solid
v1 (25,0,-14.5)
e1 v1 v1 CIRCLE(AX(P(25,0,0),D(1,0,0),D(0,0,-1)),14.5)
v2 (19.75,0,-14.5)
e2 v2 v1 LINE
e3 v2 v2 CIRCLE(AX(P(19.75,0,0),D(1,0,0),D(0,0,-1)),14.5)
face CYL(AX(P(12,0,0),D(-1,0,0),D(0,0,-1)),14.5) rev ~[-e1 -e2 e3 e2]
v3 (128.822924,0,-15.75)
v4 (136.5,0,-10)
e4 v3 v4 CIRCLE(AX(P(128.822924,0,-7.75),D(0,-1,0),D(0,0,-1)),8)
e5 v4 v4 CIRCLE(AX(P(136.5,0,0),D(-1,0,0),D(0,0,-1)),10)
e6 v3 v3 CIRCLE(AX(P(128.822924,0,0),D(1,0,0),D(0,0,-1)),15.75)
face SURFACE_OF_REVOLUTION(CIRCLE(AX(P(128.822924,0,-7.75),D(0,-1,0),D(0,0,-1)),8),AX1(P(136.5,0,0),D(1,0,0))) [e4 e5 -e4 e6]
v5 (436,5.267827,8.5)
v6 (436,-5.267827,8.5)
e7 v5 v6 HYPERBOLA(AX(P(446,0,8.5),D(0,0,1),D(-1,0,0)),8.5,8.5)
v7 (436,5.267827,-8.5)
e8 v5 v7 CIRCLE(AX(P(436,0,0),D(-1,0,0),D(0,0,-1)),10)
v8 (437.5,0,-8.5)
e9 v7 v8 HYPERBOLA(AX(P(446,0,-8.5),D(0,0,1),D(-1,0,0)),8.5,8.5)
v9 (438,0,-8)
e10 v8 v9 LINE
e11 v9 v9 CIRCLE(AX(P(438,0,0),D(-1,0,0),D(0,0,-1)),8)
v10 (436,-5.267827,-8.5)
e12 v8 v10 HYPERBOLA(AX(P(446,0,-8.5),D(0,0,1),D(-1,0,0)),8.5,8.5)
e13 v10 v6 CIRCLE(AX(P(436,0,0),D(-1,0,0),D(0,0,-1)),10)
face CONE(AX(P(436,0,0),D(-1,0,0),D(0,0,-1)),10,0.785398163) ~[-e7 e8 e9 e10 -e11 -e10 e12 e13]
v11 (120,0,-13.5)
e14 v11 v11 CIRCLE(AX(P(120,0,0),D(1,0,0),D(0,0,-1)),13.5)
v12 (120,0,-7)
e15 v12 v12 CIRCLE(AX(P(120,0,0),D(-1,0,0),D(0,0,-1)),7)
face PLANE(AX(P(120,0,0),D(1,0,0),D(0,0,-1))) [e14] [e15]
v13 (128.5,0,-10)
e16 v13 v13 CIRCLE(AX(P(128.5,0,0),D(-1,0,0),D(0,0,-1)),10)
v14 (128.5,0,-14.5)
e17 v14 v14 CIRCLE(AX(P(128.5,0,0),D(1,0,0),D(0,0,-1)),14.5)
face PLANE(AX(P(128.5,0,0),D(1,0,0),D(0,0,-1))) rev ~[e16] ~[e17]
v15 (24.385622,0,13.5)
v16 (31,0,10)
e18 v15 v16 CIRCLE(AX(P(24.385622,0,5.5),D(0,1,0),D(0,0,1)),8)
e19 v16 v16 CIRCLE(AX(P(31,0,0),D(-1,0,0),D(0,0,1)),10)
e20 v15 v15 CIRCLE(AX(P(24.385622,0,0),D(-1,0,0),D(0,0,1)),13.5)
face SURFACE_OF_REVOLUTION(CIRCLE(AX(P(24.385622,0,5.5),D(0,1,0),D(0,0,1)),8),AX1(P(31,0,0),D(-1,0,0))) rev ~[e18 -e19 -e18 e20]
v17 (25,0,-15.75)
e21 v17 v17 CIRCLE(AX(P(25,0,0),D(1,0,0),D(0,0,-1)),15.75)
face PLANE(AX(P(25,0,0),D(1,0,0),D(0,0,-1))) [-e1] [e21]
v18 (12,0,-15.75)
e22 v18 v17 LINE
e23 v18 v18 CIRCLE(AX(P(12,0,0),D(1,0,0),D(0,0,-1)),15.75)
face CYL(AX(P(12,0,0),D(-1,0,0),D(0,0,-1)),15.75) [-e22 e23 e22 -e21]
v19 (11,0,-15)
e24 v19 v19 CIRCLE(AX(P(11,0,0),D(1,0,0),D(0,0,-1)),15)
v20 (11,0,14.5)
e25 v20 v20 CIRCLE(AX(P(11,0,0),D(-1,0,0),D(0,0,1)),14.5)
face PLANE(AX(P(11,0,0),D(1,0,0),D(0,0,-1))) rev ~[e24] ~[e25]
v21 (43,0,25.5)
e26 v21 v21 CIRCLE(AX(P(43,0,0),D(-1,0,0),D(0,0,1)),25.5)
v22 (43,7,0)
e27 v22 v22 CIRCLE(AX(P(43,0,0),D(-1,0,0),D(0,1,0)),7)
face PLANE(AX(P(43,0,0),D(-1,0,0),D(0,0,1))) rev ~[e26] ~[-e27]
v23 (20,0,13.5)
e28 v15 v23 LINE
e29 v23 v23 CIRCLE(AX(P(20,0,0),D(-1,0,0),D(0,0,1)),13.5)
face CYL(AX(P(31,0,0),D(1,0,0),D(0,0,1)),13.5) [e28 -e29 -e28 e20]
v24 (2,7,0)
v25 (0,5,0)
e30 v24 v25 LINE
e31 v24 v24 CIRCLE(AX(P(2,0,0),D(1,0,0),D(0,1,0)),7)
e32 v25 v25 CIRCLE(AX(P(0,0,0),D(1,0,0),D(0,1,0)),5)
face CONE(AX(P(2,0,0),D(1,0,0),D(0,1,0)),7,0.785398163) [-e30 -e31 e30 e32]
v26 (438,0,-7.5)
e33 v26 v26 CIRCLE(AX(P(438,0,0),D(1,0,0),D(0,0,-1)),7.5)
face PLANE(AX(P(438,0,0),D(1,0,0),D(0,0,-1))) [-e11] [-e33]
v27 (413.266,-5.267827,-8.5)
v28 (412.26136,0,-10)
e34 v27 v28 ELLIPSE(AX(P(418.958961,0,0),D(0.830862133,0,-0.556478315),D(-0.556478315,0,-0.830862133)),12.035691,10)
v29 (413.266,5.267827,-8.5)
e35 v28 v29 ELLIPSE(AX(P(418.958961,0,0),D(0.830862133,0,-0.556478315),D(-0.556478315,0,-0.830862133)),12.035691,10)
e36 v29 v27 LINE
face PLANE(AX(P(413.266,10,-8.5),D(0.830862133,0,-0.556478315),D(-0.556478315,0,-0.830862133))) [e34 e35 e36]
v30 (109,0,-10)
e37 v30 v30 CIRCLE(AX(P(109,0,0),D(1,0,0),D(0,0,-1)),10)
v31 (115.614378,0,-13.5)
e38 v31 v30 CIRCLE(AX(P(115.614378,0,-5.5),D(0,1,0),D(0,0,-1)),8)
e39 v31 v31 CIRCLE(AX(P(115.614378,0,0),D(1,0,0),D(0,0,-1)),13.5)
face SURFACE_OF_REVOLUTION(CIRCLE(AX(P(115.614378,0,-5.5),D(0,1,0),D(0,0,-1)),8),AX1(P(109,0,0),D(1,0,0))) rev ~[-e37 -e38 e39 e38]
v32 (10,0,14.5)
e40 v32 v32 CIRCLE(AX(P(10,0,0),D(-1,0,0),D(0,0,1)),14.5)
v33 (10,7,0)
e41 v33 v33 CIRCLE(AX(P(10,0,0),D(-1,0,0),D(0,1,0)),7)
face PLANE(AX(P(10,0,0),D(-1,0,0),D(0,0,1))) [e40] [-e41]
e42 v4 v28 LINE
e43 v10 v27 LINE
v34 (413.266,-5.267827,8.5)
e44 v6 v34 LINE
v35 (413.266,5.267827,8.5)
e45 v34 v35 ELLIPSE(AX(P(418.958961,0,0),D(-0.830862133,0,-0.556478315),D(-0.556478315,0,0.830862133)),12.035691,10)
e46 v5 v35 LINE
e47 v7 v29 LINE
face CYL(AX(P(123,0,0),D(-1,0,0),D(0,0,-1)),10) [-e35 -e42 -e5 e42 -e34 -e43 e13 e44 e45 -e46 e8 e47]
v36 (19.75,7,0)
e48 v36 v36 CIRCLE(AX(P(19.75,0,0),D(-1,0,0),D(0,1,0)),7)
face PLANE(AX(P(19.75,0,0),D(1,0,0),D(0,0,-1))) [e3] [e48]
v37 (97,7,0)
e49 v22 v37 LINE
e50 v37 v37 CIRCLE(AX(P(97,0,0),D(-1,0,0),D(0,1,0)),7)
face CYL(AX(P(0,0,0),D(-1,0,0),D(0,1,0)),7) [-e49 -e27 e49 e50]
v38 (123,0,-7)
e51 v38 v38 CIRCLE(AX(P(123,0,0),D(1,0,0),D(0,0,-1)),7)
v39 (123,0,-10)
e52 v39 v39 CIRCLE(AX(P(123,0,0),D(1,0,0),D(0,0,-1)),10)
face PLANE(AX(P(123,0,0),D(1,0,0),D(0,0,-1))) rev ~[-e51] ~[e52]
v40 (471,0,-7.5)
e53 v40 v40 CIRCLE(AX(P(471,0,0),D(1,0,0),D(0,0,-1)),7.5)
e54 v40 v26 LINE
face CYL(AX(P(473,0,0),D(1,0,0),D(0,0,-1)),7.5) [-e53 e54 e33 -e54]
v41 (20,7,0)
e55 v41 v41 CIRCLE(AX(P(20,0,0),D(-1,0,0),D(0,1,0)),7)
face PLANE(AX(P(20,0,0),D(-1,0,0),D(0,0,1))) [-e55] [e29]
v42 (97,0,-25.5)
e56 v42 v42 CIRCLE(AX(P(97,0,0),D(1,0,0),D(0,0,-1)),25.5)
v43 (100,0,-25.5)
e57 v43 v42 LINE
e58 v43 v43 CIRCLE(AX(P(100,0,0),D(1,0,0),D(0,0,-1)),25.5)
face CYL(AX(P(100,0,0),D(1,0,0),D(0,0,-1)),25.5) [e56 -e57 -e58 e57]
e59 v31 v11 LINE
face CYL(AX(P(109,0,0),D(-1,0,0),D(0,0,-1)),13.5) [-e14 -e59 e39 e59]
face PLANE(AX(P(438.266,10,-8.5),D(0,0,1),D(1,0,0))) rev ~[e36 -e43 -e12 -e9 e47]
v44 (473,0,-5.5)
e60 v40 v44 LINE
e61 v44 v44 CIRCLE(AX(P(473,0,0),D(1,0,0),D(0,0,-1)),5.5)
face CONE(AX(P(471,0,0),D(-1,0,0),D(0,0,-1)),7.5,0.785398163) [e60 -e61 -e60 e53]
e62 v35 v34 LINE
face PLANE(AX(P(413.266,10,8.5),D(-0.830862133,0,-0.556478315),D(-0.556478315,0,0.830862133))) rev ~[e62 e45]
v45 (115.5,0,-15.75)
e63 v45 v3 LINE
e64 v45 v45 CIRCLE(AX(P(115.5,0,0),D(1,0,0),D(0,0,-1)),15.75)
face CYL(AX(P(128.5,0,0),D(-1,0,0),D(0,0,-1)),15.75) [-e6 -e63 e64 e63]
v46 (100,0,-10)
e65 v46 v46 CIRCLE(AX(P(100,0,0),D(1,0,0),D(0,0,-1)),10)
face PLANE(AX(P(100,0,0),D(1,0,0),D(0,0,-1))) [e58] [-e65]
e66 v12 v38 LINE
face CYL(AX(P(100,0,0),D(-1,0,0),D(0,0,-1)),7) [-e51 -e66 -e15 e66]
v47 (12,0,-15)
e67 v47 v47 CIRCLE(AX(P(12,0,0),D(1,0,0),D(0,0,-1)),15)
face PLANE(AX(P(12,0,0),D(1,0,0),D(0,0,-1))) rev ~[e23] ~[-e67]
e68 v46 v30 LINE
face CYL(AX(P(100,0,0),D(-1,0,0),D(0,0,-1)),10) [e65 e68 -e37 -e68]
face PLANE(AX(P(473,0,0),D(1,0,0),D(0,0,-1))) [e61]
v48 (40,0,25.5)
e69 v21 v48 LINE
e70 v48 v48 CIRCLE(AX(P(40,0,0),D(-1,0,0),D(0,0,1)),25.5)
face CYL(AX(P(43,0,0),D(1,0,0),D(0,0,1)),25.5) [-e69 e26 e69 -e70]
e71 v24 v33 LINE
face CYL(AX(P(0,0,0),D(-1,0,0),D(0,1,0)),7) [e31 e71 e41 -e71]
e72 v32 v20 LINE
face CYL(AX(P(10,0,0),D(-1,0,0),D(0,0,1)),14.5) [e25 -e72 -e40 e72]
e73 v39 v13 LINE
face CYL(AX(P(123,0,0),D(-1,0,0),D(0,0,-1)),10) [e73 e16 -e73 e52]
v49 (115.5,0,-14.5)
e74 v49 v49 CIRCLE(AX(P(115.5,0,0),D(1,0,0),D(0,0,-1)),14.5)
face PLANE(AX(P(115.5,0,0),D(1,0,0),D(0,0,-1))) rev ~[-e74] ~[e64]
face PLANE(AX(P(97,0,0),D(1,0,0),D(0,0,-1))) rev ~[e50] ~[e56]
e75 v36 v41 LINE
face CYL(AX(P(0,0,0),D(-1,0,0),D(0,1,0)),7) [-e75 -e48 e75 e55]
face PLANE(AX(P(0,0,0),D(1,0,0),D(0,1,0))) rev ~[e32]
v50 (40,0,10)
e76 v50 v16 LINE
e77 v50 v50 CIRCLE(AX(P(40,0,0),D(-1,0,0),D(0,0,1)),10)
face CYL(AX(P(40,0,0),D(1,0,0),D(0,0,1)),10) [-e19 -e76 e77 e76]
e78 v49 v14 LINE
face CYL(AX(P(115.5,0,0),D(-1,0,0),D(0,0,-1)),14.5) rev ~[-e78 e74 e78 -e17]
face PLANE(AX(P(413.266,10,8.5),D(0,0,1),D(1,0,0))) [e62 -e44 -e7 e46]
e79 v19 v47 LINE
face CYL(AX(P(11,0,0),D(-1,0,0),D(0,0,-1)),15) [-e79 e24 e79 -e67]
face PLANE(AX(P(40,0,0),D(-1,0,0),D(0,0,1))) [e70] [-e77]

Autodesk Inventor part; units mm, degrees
sketch "Szkic1" plane through (0, 0, 0) normal (1, 0, 0) x (0, 1, 0)
  circle A0 centre (0, 0) radius 7
  dimension "d0" = 14
extrude "Wyciągnięcie proste1" add sketch "Szkic1" along normal blind 100
sketch "Szkic2" plane through (100, 0, 0) normal (1, 0, 0) x (0, 0, -1)
  circle A0 centre (0, 0) radius 25.5
  dimension "d3" = 51
extrude "Wyciągnięcie proste2" add sketch "Szkic2" against normal blind 3
ref_plane "Płaszczyzna konstrukcyjna1" through (43, 0, 0) normal (-1, 0, 0) x (0, 0, 1)
sketch "Szkic3" plane through (43, 0, 0) normal (-1, 0, 0) x (0, 0, 1)
  circle A0 centre (0, 0) radius 25.5
extrude "Wyciągnięcie proste3" add sketch "Szkic3" along normal blind 3
sketch "Szkic4" plane through (40, 0, 0) normal (-1, 0, 0) x (0, 0, 1)
  circle A0 centre (0, 0) radius 10
  dimension "d9" = 20
extrude "Wyciągnięcie proste4" add sketch "Szkic4" along normal blind 9
sketch "Szkic5" plane through (31, 0, 0) normal (-1, 0, 0) x (0, 0, 1)
  circle A0 centre (0, 0) radius 13.5
  dimension "d12" = 27
extrude "Wyciągnięcie proste5" add sketch "Szkic5" along normal blind 11
fillet "Zaokrąglenie1" radius 8 1 edges at (31, 0, -13.5)
ref_plane "Płaszczyzna konstrukcyjna2" through (10, 0, 0) normal (-1, 0, 0) x (0, 0, 1)
sketch "Szkic6" plane through (10, 0, 0) normal (-1, 0, 0) x (0, 0, 1)
  circle A0 centre (0, 0) radius 14.5
  dimension "d19" = 29
extrude "Wyciągnięcie proste6" add sketch "Szkic6" against normal blind 1
sketch "Szkic7" plane through (11, 0, 0) normal (1, 0, 0) x (0, 0, -1)
  circle A0 centre (0, 0) radius 15
  dimension "d22" = 30
extrude "Wyciągnięcie proste7" add sketch "Szkic7" along normal blind 1
sketch "Szkic8" plane through (12, 0, 0) normal (1, 0, 0) x (0, 0, -1)
  circle A0 centre (0, 0) radius 7 projected
  circle A1 centre (0, 0) radius 15.75
  circle A2 centre (0, 0) radius 13.5 projected
  circle A3 centre (0, 0) radius 14.5
  dimension "d25" = 31.5
extrude "Wyciągnięcie proste8" add sketch "Szkic8" along normal blind 13 contours A1
extrude "Wyciągnięcie proste9" add sketch "Szkic8" along normal blind 7.75 contours A0 | A2 | A3
sketch "Szkic9" plane through (100, 0, 0) normal (1, 0, 0) x (0, 0, -1)
  circle A0 centre (0, 0) radius 7
  circle A1 centre (0, 0) radius 10
  dimension "d30" = 14
  dimension "d33" = 20
extrude "Wyciągnięcie proste10" add sketch "Szkic9" along normal blind 23 contours A0
extrude "Wyciągnięcie proste11" add sketch "Szkic9" along normal blind 9
sketch "Szkic10" plane through (109, 0, 0) normal (1, 0, 0) x (0, 0, -1)
  circle A0 centre (0, 0) radius 25.5 projected
  circle A1 centre (0, 0) radius 13.5
  dimension "d36" = 27
extrude "Wyciągnięcie proste12" add sketch "Szkic10" along normal blind 11 contours A1
fillet "Zaokrąglenie2" radius 8 1 edges at (109, 0, 13.5)
ref_plane "Płaszczyzna konstrukcyjna3" through (115.5, 0, 0) normal (1, 0, 0) x (0, 0, -1)
sketch "Szkic11" plane through (115.5, 0, 0) normal (1, 0, 0) x (0, 0, -1)
  circle A0 centre (0, 0) radius 15.75
  circle A1 centre (0, 0) radius 14.5
  dimension "d41" = 31.5
  dimension "d42" = 29
extrude "Wyciągnięcie proste13" add sketch "Szkic11" along normal blind 13
sketch "Szkic12" plane through (123, 0, 0) normal (1, 0, 0) x (0, 0, -1)
  circle A0 centre (0, 0) radius 10
  dimension "d45" = 20
extrude "Wyciągnięcie proste14" add sketch "Szkic12" along normal blind 350
ref_plane "Płaszczyzna konstrukcyjna4" through (128.5, 0, 0) normal (1, 0, 0) x (0, 0, -1)
sketch "Szkic13" plane through (128.5, 0, 0) normal (1, 0, 0) x (0, 0, -1)
  circle A0 centre (0, 0) radius 15.75
extrude "Wyciągnięcie proste15" add sketch "Szkic13" along normal blind 8
fillet "Zaokrąglenie3" radius 8 1 edges at (136.5, 0, 15.75)
sketch "Szkic14" plane through (473, 0, 0) normal (1, 0, 0) x (0, 0, -1)
  circle A0 centre (0, 0) radius 7.5
  circle A1 centre (0, 0) radius 18.8953
  dimension "d52" = 15
extrude "Wyciągnięcie proste16" cut sketch "Szkic14" against normal blind 35
thread "Gwint2" size "M15x1.5" class "6g" standard "ANSI Metric M Profile" length 33
chamfer "Faza1" distance 2 angle 45 2 edges at (473, 0, 7.5) (438, 0, 10)
ref_plane "Płaszczyzna konstrukcyjna5" through (123, 10, 0) normal (0, 1, 0) x (-1, 0, 0)
sketch "Szkic15" plane through (123, 10, 0) normal (0, 1, 0) x (-1, 0, 0)
  line L0 (-290.266, 8.5) -> (-315.266, 8.5)
  line L1 (-315.266, 8.5) -> (-315.266, -8.5)
  line L2 (-315.266, -8.5) -> (-290.266, -8.5)
  line L3 (-290.266, -8.5) -> (-290.266, 8.5)
  line L4 (-290.266, 8.5) -> (-315.266, -8.5) construction
  line L5 (-315.266, 8.5) -> (-290.266, -8.5) construction
  line L6 (-317.1784, 11.3555) -> (-288.3535, 11.3555)
  line L7 (-288.3535, 11.3555) -> (-288.3535, -11.3555)
  line L8 (-288.3535, -11.3555) -> (-317.1784, -11.3555)
  line L9 (-317.1784, -11.3555) -> (-317.1784, 11.3555)
  line L10 (-317.1784, 11.3555) -> (-288.3535, -11.3555) construction
  line L11 (-288.3535, 11.3555) -> (-317.1784, -11.3555) construction
  line L12 (-290.266, -8.5) -> (-288.3535, -11.3555)
  line L13 (-290.266, 8.5) -> (-288.3535, 11.3555)
  line L14 (-315.266, -8.5) -> (-317.1784, -8.5)
  line L15 (-315.266, 8.5) -> (-317.1784, 8.5)
  point P0 (123, 0)
  point P1 (-302.766, 0)
  dimension "d60" = 25
  dimension "d61" = 17
extrude "Wyciągnięcie proste17" cut sketch "Szkic15" against normal blind 35 contours L0 L15 L9 L6 L13 | L12 L8 L9 L14 L2
thread "Gwint4" size "M14x2" class "6g" standard "ANSI Metric M Profile" length 33
chamfer "Faza3" distance 2 angle 45 1 edges at (0, -7, 0)
properties part number "tłoczysko"
